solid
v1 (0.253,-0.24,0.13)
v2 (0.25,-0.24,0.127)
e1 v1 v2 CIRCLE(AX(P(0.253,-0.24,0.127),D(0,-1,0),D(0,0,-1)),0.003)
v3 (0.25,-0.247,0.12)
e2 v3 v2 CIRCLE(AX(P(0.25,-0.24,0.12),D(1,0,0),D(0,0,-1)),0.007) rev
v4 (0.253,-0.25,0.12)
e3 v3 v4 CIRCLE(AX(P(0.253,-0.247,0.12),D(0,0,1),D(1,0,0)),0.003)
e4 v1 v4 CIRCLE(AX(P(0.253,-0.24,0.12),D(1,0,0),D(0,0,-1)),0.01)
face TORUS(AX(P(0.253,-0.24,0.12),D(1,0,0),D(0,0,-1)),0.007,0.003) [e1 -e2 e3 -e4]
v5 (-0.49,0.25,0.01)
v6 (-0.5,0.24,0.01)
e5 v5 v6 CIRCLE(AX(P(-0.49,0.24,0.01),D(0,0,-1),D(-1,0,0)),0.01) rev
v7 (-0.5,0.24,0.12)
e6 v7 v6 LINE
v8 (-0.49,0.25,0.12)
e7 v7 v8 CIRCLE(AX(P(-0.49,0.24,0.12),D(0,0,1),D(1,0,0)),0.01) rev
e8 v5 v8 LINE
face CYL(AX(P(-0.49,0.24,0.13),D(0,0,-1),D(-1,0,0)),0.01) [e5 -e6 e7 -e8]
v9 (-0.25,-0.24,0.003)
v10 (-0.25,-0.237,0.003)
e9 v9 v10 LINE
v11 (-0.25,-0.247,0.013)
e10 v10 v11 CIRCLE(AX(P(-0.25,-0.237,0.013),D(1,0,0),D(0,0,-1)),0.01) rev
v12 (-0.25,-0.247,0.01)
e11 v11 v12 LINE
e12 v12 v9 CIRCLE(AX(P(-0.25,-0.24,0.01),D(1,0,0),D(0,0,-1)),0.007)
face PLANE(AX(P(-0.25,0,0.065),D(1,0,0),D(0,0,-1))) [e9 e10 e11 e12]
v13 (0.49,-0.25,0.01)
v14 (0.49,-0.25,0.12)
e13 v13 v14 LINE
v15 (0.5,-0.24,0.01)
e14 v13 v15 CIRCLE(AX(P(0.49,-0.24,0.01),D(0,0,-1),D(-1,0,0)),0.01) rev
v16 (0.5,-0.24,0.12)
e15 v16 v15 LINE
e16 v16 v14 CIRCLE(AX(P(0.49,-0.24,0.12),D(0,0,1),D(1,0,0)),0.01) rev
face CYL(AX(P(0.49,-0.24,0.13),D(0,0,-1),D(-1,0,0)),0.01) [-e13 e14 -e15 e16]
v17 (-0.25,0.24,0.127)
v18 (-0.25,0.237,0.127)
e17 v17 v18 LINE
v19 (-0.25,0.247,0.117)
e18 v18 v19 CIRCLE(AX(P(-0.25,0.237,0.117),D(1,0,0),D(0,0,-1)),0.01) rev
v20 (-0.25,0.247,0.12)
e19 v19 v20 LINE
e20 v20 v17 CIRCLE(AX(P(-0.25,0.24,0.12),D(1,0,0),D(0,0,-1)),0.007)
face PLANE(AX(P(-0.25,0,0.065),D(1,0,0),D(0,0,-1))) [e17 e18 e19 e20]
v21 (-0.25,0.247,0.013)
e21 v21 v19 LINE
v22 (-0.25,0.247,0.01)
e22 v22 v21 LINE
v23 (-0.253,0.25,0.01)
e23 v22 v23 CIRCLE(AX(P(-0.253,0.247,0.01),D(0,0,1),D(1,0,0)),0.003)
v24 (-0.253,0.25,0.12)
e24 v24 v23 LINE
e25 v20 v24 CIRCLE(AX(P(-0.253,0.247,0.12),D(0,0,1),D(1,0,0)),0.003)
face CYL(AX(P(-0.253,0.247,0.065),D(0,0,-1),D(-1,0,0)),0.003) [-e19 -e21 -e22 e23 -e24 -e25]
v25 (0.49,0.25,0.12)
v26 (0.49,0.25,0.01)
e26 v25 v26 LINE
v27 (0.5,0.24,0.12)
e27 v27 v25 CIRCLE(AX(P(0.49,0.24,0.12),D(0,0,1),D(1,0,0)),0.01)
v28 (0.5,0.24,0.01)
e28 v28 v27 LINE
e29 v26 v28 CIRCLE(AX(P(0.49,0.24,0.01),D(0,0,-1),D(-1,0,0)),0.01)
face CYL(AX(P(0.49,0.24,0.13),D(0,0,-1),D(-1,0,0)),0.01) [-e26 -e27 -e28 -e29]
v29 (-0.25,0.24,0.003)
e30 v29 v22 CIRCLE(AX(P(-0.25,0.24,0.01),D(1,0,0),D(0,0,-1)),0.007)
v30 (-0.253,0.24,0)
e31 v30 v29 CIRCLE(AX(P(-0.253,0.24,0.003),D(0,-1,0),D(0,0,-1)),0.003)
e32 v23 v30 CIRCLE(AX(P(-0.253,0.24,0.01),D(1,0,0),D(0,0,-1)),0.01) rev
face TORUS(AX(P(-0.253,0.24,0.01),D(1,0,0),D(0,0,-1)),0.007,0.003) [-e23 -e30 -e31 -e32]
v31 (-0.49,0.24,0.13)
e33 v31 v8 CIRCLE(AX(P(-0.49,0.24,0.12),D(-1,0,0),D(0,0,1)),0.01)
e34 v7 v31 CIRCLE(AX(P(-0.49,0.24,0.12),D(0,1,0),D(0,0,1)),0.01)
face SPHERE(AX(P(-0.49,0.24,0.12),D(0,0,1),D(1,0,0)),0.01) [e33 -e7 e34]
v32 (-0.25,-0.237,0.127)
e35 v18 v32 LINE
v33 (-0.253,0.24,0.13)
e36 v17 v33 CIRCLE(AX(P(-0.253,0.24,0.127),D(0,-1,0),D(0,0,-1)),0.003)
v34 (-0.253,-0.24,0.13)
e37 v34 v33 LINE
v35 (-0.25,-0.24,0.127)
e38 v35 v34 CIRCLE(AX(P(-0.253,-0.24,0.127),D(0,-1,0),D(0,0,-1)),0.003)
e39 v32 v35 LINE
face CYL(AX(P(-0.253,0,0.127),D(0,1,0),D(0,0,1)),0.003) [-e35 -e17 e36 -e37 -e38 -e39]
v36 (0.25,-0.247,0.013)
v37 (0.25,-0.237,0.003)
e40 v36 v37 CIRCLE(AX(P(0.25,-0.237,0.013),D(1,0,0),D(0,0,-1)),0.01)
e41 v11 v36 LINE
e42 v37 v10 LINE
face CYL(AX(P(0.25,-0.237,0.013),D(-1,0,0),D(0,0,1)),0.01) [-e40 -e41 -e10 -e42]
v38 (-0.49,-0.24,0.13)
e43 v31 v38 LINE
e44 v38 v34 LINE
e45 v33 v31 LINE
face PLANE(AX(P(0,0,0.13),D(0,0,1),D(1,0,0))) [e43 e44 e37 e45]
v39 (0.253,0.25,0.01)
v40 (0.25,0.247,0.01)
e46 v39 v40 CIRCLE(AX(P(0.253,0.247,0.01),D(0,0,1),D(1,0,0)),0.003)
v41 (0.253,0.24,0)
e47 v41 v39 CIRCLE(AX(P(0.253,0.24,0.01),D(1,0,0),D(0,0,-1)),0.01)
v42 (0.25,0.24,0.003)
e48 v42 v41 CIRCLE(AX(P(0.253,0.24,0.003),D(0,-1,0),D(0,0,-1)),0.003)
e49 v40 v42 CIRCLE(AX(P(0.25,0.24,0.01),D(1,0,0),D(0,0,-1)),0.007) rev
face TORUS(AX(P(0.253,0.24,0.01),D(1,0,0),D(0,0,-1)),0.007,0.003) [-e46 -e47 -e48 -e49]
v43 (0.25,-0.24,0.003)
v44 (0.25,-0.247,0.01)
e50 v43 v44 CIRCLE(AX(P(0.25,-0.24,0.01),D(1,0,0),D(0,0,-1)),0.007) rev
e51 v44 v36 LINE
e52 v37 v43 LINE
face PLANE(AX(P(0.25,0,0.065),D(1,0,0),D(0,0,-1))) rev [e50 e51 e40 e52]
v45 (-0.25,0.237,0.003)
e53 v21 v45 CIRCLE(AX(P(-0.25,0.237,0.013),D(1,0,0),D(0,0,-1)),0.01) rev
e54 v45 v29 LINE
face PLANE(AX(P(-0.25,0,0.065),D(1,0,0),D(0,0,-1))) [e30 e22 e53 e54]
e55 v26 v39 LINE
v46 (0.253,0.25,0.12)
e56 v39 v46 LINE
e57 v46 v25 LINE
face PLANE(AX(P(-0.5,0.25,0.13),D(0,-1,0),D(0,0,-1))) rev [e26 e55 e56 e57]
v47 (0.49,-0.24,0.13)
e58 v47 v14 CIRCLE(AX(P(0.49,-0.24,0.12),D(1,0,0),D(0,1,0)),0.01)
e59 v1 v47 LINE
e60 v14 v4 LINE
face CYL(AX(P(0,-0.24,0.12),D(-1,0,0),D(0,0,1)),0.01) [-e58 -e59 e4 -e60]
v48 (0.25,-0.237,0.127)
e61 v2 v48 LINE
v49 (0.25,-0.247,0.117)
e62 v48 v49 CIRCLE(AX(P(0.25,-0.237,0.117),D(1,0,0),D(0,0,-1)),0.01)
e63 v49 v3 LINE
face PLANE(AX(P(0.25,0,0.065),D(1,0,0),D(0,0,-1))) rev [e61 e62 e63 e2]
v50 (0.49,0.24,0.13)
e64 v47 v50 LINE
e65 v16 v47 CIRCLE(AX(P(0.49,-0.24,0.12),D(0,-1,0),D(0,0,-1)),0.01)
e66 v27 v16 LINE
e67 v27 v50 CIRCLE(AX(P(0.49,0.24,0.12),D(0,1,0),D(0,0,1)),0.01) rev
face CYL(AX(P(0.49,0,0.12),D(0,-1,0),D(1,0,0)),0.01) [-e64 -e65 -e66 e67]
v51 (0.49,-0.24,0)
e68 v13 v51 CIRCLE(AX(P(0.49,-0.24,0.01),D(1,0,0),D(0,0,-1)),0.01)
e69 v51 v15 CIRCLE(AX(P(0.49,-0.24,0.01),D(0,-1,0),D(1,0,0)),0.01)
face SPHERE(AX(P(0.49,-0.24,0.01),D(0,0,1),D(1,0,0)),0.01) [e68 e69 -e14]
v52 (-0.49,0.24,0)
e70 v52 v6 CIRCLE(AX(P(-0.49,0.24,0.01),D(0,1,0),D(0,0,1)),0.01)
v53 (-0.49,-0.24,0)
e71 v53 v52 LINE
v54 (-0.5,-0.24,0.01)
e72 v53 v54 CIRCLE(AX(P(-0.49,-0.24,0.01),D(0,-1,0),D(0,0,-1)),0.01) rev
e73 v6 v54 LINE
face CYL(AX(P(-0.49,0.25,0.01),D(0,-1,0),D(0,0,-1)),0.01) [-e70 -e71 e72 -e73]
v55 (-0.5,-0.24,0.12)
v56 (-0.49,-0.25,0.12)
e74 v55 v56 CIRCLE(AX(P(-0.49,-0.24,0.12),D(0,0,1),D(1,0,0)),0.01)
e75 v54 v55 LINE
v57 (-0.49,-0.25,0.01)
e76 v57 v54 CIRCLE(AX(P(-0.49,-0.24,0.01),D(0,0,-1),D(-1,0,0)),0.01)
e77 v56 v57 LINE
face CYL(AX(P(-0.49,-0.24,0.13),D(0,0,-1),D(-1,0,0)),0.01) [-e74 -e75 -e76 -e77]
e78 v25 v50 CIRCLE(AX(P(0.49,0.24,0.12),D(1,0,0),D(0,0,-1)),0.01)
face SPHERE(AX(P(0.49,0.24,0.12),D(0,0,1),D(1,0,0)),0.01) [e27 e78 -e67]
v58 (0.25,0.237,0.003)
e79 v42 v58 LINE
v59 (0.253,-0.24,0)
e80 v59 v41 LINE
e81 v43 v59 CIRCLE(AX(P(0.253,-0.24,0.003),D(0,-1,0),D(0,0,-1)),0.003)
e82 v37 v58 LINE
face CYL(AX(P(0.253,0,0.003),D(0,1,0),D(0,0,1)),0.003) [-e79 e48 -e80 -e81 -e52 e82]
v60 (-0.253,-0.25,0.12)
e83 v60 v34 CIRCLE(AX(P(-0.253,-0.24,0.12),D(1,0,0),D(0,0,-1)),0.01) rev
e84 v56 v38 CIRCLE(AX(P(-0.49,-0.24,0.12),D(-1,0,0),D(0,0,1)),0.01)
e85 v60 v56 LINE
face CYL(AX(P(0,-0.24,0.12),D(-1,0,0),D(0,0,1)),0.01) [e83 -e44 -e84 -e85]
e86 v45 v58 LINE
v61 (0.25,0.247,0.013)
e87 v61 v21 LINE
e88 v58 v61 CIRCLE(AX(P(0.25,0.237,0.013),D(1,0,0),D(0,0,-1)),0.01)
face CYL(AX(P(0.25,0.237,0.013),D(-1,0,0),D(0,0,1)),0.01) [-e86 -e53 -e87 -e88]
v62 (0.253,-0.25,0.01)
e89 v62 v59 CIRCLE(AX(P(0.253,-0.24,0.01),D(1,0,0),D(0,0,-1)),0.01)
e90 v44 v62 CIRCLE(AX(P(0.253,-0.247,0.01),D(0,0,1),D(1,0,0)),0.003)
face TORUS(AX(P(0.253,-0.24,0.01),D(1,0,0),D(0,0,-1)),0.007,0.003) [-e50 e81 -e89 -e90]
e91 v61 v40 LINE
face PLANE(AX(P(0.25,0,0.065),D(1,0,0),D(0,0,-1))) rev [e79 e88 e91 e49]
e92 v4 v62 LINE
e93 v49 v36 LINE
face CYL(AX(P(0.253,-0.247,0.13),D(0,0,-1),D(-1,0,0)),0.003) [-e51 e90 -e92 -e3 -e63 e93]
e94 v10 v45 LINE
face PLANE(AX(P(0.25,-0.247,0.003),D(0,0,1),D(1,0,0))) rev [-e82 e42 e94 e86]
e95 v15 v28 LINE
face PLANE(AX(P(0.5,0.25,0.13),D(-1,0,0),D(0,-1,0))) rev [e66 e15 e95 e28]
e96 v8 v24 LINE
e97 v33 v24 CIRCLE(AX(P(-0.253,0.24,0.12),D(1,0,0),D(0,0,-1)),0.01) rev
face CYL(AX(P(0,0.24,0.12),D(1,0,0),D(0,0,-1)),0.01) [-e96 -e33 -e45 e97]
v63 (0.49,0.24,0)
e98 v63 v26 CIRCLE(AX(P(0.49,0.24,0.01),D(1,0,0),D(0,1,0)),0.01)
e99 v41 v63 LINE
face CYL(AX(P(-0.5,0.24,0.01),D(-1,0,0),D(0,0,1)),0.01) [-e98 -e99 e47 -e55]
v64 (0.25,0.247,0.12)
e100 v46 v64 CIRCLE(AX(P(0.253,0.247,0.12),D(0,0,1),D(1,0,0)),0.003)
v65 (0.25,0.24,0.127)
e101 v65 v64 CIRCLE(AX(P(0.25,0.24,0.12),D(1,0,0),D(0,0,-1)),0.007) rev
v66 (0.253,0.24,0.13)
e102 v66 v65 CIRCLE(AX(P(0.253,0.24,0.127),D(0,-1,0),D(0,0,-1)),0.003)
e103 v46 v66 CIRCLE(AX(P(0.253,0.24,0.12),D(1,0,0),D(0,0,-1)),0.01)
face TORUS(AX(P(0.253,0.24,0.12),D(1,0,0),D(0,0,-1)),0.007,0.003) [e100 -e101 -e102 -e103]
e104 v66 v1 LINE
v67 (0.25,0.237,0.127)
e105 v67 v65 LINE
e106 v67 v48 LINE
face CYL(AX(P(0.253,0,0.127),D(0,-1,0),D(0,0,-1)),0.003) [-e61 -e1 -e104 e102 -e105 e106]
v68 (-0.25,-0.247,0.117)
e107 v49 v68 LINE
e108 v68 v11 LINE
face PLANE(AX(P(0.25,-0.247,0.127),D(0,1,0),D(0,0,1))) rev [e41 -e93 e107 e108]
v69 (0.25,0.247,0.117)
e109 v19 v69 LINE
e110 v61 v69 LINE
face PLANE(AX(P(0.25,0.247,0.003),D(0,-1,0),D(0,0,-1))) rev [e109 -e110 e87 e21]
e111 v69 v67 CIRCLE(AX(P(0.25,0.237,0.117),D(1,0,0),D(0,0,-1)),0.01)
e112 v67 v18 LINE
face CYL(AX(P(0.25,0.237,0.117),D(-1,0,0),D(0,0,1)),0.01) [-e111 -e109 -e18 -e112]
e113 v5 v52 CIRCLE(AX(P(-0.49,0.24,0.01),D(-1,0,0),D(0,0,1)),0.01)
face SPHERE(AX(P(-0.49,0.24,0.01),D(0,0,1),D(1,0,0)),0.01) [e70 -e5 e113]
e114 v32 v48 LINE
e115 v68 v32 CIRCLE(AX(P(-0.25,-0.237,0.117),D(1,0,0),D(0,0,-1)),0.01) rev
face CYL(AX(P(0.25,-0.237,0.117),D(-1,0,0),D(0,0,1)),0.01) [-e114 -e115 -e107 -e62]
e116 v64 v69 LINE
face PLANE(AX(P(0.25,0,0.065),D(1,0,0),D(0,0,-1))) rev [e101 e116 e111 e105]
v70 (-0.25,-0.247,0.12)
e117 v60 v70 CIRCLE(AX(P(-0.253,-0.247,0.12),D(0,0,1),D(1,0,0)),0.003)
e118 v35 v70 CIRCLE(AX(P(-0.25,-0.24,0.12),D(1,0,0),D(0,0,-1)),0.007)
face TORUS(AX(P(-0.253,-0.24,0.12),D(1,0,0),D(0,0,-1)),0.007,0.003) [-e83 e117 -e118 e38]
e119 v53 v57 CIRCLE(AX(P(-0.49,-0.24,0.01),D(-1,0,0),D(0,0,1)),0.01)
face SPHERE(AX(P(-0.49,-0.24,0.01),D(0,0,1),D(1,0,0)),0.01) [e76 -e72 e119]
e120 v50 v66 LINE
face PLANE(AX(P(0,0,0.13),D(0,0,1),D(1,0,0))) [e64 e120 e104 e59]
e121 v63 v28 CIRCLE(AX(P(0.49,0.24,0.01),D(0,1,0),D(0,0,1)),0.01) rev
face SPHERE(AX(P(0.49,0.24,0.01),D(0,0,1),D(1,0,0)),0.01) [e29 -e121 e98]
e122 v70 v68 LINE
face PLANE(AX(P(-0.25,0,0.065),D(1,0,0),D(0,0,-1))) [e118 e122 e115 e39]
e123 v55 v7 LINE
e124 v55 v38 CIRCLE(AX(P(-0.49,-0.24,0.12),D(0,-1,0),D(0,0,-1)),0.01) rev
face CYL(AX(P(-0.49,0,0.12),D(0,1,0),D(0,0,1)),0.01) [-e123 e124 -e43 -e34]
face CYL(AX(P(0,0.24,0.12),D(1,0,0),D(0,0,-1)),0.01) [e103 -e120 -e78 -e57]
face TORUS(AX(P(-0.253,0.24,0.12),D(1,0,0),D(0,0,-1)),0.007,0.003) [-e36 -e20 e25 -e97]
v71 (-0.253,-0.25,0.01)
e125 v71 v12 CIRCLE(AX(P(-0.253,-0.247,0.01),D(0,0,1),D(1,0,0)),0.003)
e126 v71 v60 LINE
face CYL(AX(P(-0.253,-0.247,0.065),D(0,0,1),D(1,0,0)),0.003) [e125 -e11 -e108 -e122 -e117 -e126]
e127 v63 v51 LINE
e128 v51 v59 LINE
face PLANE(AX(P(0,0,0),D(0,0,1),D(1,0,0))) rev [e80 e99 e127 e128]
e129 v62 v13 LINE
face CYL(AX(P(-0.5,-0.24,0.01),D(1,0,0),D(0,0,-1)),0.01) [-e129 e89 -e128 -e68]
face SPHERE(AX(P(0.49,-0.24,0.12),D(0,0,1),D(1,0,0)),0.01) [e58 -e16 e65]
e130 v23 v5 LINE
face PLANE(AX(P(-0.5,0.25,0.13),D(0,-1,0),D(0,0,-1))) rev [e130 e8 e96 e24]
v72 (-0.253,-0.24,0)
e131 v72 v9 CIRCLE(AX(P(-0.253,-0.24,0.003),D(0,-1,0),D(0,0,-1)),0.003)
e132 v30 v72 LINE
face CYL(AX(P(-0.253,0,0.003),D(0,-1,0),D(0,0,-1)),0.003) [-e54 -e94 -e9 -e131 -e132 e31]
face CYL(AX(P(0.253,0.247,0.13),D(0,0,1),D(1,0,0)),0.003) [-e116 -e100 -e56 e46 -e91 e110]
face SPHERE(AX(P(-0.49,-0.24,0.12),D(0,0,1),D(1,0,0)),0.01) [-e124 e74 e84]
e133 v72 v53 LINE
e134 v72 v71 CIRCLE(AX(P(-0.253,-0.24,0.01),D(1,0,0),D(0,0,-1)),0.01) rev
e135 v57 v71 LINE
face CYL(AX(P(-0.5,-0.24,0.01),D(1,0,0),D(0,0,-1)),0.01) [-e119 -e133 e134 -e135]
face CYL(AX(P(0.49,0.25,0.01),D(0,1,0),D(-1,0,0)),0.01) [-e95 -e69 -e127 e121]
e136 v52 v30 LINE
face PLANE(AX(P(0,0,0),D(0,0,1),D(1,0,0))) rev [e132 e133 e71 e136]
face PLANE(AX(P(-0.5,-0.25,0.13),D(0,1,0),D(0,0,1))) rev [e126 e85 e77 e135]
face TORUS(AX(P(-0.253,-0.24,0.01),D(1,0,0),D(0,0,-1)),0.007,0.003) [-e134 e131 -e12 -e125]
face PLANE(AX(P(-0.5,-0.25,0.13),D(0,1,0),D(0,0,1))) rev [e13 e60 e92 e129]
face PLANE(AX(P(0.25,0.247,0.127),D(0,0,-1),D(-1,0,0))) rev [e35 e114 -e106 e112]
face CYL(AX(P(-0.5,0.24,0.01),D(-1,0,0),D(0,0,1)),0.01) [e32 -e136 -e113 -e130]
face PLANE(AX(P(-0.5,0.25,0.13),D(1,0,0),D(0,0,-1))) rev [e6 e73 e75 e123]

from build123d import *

# Parameters (mm, degrees)
SKETCH1_W                           = 1
SKETCH1_H                           = 0.5
ALL_BODY_DEPTH                      = 0.13
CUT_OUT_THE_BODY_FOR_PIN_DEPTH      = 0.25
CUT_OUT_THE_BODY_FOR_PIN_DEPTH_BACK = 0.25
SKETCH2_OUTSIDE_W                   = 2.356
SKETCH2_OUTSIDE_H                   = 2.726
SKETCH2_OUTSIDE_W_2                 = 0.124
SKETCH2_OUTSIDE_H_2                 = 0.494
BODY_FILLET_R                       = 0.01
PIN_FILLET_A_R                      = 0.01
PIN_FILLET_B_R                      = 0.003


with BuildPart() as part:
    # Sketch1 → All body (new body)
    with BuildSketch(Plane.XY):
        Rectangle(SKETCH1_W, SKETCH1_H)
    extrude(amount=ALL_BODY_DEPTH)

    # Sketch2 outside → Cut out the body for pin (cut, two sides: drawn at the far end of the back side and taken through both)
    with BuildSketch(Plane(origin=(0, 0, 0), x_dir=(0, 0, -1), z_dir=(1, 0, 0)).offset(-CUT_OUT_THE_BODY_FOR_PIN_DEPTH_BACK)):
        with Locations((-0.065, 0)):
            Rectangle(SKETCH2_OUTSIDE_W, SKETCH2_OUTSIDE_H)
        with Locations((-0.065, 0)):
            Rectangle(SKETCH2_OUTSIDE_W_2, SKETCH2_OUTSIDE_H_2, mode=Mode.SUBTRACT)
    extrude(amount=CUT_OUT_THE_BODY_FOR_PIN_DEPTH + CUT_OUT_THE_BODY_FOR_PIN_DEPTH_BACK, mode=Mode.SUBTRACT)

    # Body fillet
    body_fillet_edges = [part.edges().sort_by_distance(p)[0] for p in [
        (0, 0.247, 0.003),
        (0, 0.247, 0.127),
        (0, -0.247, 0.127),
        (0, -0.247, 0.003),
    ]]
    fillet(body_fillet_edges, radius=BODY_FILLET_R)

    # Pin fillet a
    pin_fillet_a_edges = [part.edges().sort_by_distance(p)[0] for p in [
        (0.5, 0, 0.13),
        (-0.375, 0.25, 0),
        (0.375, -0.25, 0),
        (0.375, -0.25, 0.13),
        (-0.375, 0.25, 0.13),
        (0.375, 0.25, 0.13),
        (-0.5, 0, 0.13),
        (0.375, 0.25, 0),
        (0.5, 0, 0),
        (-0.375, -0.25, 0),
        (-0.5, 0, 0),
        (-0.5, 0.25, 0.065),
        (0.5, 0.25, 0.065),
        (0.5, -0.25, 0.065),
        (-0.5, -0.25, 0.065),
        (-0.375, -0.25, 0.13),
    ]]
    fillet(pin_fillet_a_edges, radius=PIN_FILLET_A_R)

    # Pin fillet b
    pin_fillet_b_edges = [part.edges().sort_by_distance(p)[0] for p in [
        (0.25, -0.25, 0.065),
        (0.25, 0, 0.13),
        (0.25, 0.25, 0.065),
        (0.25, 0, 0),
        (-0.25, 0.25, 0.065),
        (-0.25, 0, 0.13),
        (-0.25, -0.25, 0.065),
        (-0.25, 0, 0),
        (0.25, 0.247071068, 0.002928932),
        (0.25, -0.247071068, 0.002928932),
        (0.25, -0.247071068, 0.127071068),
        (0.25, 0.247071068, 0.127071068),
        (-0.25, -0.247071068, 0.127071068),
        (-0.25, 0.247071068, 0.127071068),
        (-0.25, -0.247071068, 0.002928932),
        (-0.25, 0.247071068, 0.002928932),
    ]]
    fillet(pin_fillet_b_edges, radius=PIN_FILLET_B_R - 0.0001)  # a hair under: the kernel refuses the full size


solid = part.part
